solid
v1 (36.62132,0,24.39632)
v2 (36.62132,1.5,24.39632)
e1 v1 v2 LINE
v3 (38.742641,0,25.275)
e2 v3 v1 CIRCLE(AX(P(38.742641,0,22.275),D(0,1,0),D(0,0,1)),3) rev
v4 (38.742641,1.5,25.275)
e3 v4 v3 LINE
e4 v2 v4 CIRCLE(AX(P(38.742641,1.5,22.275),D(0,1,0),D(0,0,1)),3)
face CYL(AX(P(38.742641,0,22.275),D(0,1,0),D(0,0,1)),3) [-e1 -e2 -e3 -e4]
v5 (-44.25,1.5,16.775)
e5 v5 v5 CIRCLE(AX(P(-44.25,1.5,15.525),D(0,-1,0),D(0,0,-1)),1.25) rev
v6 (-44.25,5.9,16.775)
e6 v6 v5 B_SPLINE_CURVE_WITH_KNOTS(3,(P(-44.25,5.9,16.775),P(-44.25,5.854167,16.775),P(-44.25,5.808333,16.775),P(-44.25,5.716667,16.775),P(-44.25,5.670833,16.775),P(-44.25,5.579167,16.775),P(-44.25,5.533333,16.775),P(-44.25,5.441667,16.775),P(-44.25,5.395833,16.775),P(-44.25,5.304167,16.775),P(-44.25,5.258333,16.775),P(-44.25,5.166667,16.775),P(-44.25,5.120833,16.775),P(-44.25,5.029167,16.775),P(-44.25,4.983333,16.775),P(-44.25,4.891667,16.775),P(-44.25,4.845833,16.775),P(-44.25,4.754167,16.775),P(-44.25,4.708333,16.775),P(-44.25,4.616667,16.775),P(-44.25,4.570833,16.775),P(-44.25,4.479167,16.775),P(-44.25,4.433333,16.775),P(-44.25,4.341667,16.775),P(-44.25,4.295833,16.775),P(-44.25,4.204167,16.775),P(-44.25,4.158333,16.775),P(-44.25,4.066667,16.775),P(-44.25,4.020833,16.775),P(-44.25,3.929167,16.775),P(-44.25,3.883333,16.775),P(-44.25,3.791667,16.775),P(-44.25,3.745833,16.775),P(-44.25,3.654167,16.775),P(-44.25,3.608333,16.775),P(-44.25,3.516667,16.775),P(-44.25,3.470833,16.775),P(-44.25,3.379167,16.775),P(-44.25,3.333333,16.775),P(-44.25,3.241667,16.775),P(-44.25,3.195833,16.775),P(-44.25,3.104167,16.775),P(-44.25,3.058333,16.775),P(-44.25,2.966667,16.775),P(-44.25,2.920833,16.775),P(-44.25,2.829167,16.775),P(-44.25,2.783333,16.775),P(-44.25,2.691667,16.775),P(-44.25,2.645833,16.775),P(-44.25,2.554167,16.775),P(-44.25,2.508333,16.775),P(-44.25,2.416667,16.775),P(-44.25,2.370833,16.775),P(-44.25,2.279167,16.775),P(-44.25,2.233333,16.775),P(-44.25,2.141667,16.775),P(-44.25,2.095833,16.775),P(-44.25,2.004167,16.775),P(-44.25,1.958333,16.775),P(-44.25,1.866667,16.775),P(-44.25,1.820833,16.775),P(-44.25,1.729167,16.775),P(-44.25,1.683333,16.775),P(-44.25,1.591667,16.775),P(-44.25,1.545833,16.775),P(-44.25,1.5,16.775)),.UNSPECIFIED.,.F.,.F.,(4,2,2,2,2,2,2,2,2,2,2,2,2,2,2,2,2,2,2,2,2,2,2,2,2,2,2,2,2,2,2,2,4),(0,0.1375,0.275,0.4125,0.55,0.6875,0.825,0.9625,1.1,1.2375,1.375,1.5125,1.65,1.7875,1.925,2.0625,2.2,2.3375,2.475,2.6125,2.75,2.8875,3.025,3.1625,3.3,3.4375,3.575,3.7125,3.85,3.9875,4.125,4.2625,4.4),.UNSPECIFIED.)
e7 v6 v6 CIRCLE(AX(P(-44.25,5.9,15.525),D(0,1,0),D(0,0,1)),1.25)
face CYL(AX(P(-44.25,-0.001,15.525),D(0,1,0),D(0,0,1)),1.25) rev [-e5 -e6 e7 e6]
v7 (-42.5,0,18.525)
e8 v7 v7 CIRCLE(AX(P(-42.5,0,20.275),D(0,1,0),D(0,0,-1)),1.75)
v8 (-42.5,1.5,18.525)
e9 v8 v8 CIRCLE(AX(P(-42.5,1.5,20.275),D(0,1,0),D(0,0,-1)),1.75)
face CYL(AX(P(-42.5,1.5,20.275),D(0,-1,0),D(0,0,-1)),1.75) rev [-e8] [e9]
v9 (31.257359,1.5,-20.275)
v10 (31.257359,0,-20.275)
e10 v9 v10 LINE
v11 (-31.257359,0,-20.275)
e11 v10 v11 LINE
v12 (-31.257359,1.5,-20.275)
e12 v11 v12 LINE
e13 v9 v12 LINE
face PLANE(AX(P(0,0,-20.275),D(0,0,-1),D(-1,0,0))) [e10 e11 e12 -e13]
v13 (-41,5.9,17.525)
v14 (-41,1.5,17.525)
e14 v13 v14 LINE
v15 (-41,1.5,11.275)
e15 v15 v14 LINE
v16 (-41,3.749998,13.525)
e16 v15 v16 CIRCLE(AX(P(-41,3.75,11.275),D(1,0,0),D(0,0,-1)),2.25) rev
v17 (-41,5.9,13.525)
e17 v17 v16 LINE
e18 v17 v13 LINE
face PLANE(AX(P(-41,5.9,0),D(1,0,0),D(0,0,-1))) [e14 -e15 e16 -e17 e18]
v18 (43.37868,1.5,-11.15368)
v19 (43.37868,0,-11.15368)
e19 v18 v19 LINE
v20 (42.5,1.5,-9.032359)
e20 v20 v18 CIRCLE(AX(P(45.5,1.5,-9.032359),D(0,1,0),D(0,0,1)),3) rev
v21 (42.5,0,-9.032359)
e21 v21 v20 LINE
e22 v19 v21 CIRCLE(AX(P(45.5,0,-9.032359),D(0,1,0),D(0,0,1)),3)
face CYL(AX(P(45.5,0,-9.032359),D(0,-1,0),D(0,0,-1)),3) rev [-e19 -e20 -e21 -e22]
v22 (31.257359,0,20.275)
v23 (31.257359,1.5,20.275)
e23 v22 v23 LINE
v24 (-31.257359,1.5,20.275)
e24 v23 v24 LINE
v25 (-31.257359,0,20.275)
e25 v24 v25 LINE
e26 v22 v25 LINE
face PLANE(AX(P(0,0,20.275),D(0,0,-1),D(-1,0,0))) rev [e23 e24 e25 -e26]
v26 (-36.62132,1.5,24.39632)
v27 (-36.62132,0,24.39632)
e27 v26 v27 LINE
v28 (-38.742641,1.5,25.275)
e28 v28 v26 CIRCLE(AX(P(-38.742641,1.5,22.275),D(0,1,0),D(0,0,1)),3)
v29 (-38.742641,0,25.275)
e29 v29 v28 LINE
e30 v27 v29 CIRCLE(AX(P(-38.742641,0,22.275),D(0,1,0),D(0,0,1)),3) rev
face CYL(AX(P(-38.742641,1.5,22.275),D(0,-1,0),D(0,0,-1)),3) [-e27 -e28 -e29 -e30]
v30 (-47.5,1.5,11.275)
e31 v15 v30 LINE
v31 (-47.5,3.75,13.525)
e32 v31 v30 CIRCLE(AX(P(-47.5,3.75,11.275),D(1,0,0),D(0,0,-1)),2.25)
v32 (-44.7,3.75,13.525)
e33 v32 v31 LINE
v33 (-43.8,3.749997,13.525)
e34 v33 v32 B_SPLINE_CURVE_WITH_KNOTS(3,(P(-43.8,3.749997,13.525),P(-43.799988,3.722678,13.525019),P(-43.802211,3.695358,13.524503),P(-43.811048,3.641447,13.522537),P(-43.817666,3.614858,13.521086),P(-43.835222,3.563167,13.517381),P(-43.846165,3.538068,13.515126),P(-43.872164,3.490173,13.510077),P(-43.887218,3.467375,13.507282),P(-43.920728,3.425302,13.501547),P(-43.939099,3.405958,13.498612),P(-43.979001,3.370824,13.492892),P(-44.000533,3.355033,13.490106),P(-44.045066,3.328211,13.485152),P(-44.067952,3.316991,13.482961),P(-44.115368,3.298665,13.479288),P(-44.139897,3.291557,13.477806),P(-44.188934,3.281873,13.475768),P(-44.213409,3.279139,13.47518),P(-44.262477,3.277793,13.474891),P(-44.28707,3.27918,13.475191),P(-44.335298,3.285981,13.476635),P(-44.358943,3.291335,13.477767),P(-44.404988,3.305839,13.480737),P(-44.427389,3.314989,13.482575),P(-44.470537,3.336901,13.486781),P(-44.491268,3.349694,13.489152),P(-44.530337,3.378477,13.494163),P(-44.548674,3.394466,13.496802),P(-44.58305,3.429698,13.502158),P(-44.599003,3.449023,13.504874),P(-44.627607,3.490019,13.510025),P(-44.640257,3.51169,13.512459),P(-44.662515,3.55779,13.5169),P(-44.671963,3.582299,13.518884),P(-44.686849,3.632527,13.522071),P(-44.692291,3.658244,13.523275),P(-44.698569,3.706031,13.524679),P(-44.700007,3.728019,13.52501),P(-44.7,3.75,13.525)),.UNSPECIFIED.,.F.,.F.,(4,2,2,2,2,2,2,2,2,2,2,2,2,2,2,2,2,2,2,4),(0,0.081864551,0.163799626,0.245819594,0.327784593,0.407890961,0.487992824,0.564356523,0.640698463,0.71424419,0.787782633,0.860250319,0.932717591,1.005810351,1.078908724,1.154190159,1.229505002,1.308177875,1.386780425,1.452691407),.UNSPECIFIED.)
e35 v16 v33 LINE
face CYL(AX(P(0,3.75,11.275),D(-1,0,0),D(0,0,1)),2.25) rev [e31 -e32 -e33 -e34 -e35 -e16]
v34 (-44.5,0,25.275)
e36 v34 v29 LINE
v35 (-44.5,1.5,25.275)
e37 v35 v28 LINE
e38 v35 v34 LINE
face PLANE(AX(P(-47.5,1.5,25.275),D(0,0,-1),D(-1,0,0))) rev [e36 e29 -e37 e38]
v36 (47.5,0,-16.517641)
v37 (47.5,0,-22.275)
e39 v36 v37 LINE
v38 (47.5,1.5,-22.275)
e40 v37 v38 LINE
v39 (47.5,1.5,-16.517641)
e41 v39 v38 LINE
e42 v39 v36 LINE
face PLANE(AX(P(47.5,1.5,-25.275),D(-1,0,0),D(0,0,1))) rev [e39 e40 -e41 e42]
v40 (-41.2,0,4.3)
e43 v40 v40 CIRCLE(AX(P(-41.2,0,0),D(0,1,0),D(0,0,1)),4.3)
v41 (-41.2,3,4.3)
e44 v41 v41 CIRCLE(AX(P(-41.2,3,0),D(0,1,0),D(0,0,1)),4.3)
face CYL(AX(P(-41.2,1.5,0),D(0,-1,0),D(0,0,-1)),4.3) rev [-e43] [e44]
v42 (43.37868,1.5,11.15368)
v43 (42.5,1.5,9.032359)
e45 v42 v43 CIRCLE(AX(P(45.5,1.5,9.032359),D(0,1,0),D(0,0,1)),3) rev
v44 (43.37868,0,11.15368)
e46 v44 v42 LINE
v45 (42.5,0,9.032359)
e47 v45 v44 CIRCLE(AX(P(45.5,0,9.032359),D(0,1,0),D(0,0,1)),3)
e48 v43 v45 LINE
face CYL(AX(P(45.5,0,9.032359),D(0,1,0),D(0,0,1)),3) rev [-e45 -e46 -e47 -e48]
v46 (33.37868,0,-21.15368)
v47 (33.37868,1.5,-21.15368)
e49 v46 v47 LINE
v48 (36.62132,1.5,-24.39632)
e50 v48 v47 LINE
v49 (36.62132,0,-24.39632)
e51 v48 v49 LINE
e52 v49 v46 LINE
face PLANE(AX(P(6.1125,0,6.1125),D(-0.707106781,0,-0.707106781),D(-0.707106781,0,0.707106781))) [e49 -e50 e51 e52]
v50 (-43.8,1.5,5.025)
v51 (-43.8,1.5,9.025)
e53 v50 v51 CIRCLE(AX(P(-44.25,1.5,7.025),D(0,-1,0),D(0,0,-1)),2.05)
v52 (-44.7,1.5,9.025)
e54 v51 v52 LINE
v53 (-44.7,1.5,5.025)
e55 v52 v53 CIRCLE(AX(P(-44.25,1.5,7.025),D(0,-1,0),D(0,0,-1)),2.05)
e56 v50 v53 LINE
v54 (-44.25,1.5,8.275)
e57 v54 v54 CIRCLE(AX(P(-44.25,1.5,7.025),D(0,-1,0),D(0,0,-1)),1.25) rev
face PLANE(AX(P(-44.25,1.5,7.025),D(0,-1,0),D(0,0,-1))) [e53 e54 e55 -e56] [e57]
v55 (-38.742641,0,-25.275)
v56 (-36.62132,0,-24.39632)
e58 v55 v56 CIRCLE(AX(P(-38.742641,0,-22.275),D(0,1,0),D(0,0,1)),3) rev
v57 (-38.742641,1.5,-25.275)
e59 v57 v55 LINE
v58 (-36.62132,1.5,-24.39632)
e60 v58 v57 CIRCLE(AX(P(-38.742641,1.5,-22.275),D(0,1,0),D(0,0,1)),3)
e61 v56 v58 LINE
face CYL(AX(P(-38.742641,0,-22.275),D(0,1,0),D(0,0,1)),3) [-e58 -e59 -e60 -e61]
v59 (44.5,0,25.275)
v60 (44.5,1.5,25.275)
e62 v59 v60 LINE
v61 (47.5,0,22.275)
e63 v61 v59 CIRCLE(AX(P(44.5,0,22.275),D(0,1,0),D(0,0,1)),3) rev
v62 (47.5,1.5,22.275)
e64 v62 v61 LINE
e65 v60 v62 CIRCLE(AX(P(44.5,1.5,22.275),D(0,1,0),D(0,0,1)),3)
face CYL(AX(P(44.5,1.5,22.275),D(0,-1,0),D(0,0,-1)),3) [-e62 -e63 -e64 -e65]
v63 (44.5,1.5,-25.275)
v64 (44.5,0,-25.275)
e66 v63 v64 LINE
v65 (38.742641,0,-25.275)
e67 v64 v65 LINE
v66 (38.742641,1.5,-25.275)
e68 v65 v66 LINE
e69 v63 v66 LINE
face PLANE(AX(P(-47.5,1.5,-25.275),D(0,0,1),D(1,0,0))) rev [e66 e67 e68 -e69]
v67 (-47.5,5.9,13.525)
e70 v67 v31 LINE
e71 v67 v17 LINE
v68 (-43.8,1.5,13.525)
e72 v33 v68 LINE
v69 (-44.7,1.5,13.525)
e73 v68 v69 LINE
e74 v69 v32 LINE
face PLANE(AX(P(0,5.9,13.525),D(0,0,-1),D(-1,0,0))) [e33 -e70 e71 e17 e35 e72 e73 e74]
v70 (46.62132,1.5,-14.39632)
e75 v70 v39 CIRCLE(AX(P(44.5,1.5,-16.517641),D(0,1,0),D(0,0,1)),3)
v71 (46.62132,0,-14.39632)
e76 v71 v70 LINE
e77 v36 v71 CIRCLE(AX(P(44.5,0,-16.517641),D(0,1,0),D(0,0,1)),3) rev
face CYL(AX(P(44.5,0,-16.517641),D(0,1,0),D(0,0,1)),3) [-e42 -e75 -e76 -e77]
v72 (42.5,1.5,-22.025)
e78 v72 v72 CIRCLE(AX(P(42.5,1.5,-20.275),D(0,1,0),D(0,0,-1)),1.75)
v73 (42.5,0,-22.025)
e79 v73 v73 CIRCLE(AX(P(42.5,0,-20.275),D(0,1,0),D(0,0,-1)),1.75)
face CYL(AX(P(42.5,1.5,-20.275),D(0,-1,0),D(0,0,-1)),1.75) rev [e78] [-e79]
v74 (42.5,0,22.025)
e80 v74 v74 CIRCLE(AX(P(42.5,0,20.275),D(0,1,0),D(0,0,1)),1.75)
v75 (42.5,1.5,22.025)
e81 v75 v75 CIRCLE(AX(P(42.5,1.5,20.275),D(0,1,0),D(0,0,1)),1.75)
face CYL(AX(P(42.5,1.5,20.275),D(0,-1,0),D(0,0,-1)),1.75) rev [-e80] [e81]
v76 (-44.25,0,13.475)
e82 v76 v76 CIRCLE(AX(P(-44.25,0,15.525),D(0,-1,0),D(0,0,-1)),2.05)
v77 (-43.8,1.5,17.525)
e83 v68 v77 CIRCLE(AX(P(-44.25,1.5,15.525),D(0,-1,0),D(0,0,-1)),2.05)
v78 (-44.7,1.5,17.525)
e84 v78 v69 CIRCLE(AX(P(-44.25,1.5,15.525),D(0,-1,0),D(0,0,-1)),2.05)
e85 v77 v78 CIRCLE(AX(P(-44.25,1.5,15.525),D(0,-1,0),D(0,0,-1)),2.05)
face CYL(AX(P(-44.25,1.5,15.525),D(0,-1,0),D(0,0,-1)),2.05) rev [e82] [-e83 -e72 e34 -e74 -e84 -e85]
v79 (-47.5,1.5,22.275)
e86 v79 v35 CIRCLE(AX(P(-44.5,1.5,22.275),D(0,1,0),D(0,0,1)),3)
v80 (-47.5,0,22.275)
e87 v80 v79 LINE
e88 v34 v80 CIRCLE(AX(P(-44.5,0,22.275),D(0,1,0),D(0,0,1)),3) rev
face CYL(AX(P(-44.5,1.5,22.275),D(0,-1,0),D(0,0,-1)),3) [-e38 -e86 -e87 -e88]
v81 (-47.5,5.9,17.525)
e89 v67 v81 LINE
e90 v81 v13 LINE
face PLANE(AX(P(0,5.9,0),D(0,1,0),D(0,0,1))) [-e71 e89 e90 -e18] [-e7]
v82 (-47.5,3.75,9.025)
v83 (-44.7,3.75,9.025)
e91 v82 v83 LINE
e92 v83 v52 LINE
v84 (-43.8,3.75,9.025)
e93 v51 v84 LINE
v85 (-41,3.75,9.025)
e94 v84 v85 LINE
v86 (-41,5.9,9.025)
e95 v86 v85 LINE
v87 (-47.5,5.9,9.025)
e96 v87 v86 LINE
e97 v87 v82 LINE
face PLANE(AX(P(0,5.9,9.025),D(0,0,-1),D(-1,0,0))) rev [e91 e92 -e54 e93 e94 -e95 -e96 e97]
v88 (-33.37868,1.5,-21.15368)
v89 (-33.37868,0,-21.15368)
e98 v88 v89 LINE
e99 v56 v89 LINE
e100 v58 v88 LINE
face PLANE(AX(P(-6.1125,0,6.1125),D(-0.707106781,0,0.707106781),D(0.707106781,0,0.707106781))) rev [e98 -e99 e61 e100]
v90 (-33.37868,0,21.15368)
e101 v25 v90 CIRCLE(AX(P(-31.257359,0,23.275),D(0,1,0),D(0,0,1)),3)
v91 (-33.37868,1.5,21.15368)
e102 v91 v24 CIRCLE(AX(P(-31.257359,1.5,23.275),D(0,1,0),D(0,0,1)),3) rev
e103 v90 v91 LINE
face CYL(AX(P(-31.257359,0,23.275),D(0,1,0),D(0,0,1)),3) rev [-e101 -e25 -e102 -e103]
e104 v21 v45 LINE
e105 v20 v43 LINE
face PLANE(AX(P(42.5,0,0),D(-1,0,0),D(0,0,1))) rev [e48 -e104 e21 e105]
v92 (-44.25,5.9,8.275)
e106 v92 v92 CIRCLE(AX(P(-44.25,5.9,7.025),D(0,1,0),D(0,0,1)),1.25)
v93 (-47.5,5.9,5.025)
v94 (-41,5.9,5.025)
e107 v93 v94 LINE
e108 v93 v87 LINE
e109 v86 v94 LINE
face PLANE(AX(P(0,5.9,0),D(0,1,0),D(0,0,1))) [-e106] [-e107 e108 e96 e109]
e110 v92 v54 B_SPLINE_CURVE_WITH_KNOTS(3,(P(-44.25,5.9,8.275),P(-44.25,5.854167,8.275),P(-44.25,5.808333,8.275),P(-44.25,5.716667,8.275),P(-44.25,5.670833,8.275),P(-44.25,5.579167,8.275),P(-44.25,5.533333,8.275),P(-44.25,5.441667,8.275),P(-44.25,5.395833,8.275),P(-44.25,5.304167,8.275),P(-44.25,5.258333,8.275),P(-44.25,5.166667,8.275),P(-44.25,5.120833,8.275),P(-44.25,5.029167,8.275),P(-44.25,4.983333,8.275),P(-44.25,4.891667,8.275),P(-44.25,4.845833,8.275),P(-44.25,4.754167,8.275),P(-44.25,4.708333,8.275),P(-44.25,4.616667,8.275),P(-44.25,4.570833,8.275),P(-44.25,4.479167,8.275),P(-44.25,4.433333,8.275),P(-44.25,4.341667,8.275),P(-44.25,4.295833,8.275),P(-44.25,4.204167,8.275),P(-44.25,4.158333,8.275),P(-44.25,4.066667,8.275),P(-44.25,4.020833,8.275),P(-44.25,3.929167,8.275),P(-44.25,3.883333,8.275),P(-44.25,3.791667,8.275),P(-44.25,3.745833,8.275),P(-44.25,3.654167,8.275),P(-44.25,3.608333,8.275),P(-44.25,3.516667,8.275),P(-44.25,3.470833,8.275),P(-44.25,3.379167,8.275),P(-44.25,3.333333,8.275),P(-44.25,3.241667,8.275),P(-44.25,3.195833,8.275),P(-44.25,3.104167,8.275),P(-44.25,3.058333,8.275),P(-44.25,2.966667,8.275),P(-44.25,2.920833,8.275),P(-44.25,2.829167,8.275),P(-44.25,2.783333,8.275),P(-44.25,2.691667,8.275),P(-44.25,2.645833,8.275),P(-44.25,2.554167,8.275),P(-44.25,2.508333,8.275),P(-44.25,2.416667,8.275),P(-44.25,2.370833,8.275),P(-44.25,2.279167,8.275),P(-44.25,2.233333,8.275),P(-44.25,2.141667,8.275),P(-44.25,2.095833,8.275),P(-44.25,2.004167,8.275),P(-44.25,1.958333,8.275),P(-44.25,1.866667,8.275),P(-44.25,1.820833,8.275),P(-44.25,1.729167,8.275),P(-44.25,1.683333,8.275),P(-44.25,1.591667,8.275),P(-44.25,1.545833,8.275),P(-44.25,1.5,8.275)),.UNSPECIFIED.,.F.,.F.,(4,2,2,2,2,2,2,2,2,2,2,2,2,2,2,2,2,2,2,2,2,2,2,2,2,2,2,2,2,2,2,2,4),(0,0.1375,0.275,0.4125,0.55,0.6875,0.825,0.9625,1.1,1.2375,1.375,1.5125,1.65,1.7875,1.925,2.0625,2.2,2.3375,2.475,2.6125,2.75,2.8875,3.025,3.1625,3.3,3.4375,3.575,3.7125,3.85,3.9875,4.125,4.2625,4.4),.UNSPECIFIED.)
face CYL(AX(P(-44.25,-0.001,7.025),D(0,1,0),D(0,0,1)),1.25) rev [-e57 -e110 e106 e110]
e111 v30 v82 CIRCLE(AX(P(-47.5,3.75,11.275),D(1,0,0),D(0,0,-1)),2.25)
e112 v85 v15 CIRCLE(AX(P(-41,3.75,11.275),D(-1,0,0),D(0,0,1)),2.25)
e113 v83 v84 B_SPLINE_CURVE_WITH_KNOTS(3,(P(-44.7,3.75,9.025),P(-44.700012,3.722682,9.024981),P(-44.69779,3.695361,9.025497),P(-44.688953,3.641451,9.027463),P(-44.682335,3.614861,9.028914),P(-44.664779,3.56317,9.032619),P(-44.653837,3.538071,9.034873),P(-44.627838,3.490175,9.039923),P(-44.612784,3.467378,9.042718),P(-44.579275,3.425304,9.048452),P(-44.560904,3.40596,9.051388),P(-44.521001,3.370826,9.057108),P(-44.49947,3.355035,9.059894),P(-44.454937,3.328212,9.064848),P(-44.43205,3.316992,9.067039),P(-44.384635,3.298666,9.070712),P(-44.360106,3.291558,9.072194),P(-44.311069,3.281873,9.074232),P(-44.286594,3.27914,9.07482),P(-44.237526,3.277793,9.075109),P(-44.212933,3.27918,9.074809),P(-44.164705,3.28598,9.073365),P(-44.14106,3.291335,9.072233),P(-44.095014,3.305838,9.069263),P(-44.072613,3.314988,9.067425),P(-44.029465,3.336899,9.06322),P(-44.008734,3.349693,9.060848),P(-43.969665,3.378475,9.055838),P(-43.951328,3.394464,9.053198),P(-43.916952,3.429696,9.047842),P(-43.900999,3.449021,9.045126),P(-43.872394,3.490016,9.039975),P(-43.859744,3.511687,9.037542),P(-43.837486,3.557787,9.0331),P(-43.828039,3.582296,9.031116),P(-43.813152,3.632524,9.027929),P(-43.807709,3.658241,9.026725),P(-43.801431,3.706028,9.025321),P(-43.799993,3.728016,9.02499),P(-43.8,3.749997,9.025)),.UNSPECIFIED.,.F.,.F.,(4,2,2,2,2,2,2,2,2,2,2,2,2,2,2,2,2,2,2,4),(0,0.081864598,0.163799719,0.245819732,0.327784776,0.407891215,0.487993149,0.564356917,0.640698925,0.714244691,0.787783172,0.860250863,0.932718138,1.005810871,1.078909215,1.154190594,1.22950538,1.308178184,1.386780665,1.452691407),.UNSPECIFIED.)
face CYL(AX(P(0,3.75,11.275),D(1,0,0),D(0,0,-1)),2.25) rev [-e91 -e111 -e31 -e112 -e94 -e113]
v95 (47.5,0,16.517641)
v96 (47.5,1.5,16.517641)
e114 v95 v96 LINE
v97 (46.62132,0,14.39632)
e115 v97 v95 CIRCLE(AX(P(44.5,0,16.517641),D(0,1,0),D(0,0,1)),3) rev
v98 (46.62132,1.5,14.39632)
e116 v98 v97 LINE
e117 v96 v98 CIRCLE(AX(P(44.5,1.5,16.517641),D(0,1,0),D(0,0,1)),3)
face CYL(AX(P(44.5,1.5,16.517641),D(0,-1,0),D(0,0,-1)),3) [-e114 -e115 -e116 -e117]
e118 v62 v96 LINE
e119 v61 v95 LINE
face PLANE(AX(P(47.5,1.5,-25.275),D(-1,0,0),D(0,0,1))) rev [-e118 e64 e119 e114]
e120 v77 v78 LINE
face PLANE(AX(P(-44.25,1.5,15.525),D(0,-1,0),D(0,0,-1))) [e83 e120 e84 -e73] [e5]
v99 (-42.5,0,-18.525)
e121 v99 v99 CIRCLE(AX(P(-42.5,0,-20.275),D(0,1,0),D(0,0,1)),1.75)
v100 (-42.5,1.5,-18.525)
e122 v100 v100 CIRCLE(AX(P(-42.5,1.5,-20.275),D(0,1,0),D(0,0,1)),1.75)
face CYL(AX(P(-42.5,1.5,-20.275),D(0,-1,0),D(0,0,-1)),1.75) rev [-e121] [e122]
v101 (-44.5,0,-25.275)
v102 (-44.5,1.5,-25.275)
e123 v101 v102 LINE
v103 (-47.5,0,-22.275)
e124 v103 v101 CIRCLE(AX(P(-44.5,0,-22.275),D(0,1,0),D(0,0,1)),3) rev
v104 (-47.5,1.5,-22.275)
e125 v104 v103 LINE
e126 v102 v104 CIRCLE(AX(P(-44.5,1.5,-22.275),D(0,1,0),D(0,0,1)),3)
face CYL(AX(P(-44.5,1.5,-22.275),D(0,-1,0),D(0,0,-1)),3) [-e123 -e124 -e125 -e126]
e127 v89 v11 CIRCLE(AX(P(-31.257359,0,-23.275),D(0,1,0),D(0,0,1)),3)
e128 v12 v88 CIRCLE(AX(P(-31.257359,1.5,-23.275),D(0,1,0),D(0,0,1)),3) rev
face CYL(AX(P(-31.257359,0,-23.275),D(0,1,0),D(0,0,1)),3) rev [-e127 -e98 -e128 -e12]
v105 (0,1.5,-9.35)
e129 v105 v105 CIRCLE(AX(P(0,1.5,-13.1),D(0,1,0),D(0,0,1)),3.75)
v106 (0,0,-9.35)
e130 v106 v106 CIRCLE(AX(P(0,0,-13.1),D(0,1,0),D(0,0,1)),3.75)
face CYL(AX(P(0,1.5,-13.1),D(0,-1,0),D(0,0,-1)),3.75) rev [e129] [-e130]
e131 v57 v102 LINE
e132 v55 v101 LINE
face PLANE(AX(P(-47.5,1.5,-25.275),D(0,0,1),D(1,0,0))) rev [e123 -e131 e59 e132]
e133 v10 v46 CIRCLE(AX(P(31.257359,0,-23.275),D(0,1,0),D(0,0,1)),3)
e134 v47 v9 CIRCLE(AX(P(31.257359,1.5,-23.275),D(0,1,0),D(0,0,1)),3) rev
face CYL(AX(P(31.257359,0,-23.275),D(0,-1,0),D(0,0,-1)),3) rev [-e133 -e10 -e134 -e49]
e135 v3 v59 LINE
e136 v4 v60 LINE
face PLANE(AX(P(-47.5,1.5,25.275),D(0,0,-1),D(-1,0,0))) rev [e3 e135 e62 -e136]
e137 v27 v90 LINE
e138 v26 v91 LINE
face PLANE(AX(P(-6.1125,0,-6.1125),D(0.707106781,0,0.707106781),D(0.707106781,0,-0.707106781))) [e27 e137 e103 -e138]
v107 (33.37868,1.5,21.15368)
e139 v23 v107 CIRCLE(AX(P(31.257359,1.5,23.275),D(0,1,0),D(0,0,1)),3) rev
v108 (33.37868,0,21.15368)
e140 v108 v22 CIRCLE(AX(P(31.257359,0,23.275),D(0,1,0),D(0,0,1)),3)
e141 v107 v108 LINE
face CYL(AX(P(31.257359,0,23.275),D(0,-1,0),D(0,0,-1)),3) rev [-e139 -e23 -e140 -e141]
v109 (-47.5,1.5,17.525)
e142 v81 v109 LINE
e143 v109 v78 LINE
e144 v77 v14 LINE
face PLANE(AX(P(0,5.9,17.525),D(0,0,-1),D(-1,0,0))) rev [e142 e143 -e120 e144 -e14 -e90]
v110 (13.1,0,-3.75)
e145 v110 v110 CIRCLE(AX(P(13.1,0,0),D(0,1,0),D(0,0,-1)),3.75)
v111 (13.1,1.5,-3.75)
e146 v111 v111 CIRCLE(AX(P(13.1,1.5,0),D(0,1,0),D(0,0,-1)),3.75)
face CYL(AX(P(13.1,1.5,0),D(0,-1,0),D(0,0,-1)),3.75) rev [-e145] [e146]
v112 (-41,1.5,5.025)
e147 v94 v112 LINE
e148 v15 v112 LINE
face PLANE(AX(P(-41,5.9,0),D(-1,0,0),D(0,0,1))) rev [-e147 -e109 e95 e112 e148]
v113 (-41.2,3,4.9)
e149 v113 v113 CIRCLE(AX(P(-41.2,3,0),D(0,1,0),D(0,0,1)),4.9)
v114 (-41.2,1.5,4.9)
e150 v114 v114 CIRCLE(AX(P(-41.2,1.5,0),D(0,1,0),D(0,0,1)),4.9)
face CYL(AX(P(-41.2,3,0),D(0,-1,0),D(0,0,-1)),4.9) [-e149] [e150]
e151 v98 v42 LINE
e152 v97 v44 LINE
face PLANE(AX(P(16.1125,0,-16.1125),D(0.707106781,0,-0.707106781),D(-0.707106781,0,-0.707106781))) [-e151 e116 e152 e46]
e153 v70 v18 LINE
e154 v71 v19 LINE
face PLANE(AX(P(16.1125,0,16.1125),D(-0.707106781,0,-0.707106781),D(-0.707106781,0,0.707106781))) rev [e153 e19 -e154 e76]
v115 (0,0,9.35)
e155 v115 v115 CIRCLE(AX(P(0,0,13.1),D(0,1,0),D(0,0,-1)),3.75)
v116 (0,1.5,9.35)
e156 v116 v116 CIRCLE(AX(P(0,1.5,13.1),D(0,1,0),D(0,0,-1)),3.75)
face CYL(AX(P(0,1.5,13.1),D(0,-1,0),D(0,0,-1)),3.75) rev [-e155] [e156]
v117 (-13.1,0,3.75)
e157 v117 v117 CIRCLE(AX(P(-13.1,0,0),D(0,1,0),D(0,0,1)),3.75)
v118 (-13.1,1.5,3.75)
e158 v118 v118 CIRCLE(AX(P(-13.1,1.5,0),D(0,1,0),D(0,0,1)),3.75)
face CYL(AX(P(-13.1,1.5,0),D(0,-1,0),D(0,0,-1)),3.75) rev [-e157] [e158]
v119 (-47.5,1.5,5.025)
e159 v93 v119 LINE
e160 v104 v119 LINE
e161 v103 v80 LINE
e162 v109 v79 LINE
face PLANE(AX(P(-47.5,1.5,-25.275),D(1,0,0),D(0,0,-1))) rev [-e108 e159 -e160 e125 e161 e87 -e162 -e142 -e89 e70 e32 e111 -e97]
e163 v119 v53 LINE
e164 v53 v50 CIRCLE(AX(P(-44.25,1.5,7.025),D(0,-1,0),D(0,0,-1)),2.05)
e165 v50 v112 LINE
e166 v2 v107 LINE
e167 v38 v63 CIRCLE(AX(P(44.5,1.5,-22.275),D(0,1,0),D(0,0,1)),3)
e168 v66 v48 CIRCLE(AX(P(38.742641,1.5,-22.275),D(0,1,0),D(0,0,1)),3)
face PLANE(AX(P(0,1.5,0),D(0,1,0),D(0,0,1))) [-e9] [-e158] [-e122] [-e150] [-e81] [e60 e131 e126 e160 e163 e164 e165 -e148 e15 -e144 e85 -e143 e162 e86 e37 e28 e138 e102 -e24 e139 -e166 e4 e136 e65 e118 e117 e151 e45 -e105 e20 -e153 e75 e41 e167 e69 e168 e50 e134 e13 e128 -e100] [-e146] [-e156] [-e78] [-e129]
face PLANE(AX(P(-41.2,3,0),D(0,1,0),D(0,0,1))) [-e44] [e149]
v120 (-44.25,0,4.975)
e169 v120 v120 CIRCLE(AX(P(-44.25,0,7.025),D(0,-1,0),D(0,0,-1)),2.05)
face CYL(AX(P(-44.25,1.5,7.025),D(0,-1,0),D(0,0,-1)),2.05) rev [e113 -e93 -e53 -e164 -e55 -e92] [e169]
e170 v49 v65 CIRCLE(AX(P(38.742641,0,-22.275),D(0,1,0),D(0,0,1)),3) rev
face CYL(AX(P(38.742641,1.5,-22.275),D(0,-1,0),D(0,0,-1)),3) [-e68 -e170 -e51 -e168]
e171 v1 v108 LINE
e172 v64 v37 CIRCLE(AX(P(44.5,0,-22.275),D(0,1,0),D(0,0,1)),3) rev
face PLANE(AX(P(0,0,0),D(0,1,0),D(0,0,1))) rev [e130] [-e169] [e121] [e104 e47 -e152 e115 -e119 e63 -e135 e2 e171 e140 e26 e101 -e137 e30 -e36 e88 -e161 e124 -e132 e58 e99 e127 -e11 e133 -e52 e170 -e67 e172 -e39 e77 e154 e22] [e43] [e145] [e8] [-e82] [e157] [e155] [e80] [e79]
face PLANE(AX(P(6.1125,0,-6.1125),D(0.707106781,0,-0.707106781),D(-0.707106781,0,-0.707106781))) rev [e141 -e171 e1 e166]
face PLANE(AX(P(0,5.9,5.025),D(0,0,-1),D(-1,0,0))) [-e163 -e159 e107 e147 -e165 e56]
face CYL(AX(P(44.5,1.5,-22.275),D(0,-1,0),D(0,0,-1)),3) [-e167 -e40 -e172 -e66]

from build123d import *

# Parameters (mm, degrees)
SKETCH1_W           = 95
SKETCH1_H           = 50.55
SKETCH1_R           = 1.75
SKETCH1_R_2         = 3.75
SKETCH1_R_3         = 4.3
BOSS_EXTRUDE1_DEPTH = 1.5
CUT_EXTRUDE1_DEPTH  = 1.5
FILLET1_R           = 3
SKETCH3_R           = 4.9
SKETCH3_R_2         = 4.3
BOSS_EXTRUDE2_DEPTH = 1.5
SKETCH5_W           = 6.5
SKETCH5_H           = 4
BOSS_EXTRUDE3_DEPTH = 4.4
CUT_EXTRUDE2_REACH  = 56.128
SKETCH6_R           = 1.25
SKETCH8_R           = 2.05
CUT_EXTRUDE3_DEPTH  = 1.5
FILLET2_R           = 2.25


with BuildPart() as part:
    # Sketch1 → Boss-Extrude1 (new body)
    with BuildSketch(Plane(origin=(0, 0, 0), x_dir=(1, 0, 0), z_dir=(0, 1, 0))):
        Rectangle(SKETCH1_W, SKETCH1_H)
        with Locations(Location((-42.5, 20.275, 0), (0, 0, 270))):
            Circle(SKETCH1_R, mode=Mode.SUBTRACT)
        with Locations(Location((42.5, 20.275, 0), (0, 0, 90))):
            Circle(SKETCH1_R, mode=Mode.SUBTRACT)
        with Locations(Location((42.5, -20.275, 0), (0, 0, 270))):
            Circle(SKETCH1_R, mode=Mode.SUBTRACT)
        with Locations(Location((-42.5, -20.275, 0), (0, 0, 90))):
            Circle(SKETCH1_R, mode=Mode.SUBTRACT)
        with Locations(Location((-13.1, 0, 0), (0, 0, 270))):
            Circle(SKETCH1_R_2, mode=Mode.SUBTRACT)
        with Locations(Location((13.1, 0, 0), (0, 0, 90))):
            Circle(SKETCH1_R_2, mode=Mode.SUBTRACT)
        with Locations(Location((0, 13.1, 0), (0, 0, 270))):
            Circle(SKETCH1_R_2, mode=Mode.SUBTRACT)
        with Locations(Location((0, -13.1, 0), (0, 0, 90))):
            Circle(SKETCH1_R_2, mode=Mode.SUBTRACT)
        with Locations(Location((-41.2, 0, 0), (0, 0, 270))):
            Circle(SKETCH1_R_3, mode=Mode.SUBTRACT)
    extrude(amount=BOSS_EXTRUDE1_DEPTH)

    # Sketch2 → Cut-Extrude1 (cut)
    with BuildSketch(Plane(origin=(0, 1.5, 0), x_dir=(1, 0, 0), z_dir=(0, 1, 0))):
        Polygon((-32.5, 20.275), (32.5, 20.275), (37.5, 25.275), (-37.5, 25.275), align=None)
        Polygon((37.5, -25.275), (32.5, -20.275), (-32.5, -20.275), (-37.5, -25.275), align=None)
        Polygon((47.5, -15.275), (47.5, 15.275), (42.5, 10.275), (42.5, -10.275), align=None)
    extrude(amount=-CUT_EXTRUDE1_DEPTH, mode=Mode.SUBTRACT)

    # Fillet1
    fillet1_edges = [part.edges().sort_by_distance(p)[0] for p in [
        (37.5, 0.75, -25.275),
        (32.5, 0.75, -20.275),
        (-32.5, 0.75, -20.275),
        (-37.5, 0.75, -25.275),
        (-37.5, 0.75, 25.275),
        (-32.5, 0.75, 20.275),
        (32.5, 0.75, 20.275),
        (37.5, 0.75, 25.275),
        (47.5, 0.75, 25.275),
        (-47.5, 0.75, 25.275),
        (-47.5, 0.75, -25.275),
        (47.5, 0.75, -25.275),
        (47.5, 0.75, 15.275),
        (42.5, 0.75, 10.275),
        (42.5, 0.75, -10.275),
        (47.5, 0.75, -15.275),
    ]]
    fillet(fillet1_edges, radius=FILLET1_R)

    # Sketch3 → Boss-Extrude2 (add)
    with BuildSketch(Plane(origin=(0, 1.5, 0), x_dir=(1, 0, 0), z_dir=(0, 1, 0))):
        with Locations(Location((-41.2, 0, 0), (0, 0, 270))):
            Circle(SKETCH3_R)
        with Locations(Location((-41.2, 0, 0), (0, 0, 270))):
            Circle(SKETCH3_R_2, mode=Mode.SUBTRACT)
    extrude(amount=BOSS_EXTRUDE2_DEPTH)

    # Sketch5 → Boss-Extrude3 (add)
    with BuildSketch(Plane(origin=(0, 1.5, 0), x_dir=(1, 0, 0), z_dir=(0, 1, 0))):
        with Locations((-44.25, -7.025)):
            Rectangle(SKETCH5_W, SKETCH5_H)
        with Locations((-44.25, -15.525)):
            Rectangle(SKETCH5_W, SKETCH5_H)
    extrude(amount=BOSS_EXTRUDE3_DEPTH)

    # Sketch6 → Cut-Extrude2 (cut, up to next)
    with BuildSketch(Plane(origin=(0, 5.9, 0), x_dir=(1, 0, 0), z_dir=(0, 1, 0)), mode=Mode.PRIVATE) as cut_extrude2_sk1:
        with Locations(Location((-44.25, -7.025, 0), (0, 0, 270))):
            Circle(SKETCH6_R)
    cut_extrude2_tool1 = extrude(cut_extrude2_sk1.sketch, amount=-CUT_EXTRUDE2_REACH, mode=Mode.PRIVATE) & part.part
    # Sketch6 → Cut-Extrude2 (cut, up to next)
    with BuildSketch(Plane(origin=(0, 5.9, 0), x_dir=(1, 0, 0), z_dir=(0, 1, 0)), mode=Mode.PRIVATE) as cut_extrude2_sk2:
        with Locations(Location((-44.25, -15.525, 0), (0, 0, 270))):
            Circle(SKETCH6_R)
    cut_extrude2_tool2 = extrude(cut_extrude2_sk2.sketch, amount=-CUT_EXTRUDE2_REACH, mode=Mode.PRIVATE) & part.part
    add(cut_extrude2_tool1.solids().sort_by_distance((-44.25, 5.9, 7.025))[0], mode=Mode.SUBTRACT)
    add(cut_extrude2_tool2.solids().sort_by_distance((-44.25, 5.9, 15.525))[0], mode=Mode.SUBTRACT)

    # Sketch8 → Cut-Extrude3 (cut)
    with BuildSketch(Plane.XZ):
        with Locations(Location((-44.25, 15.525, 0), (0, 0, 270))):
            Circle(SKETCH8_R)
        with Locations(Location((-44.25, 7.025, 0), (0, 0, 270))):
            Circle(SKETCH8_R)
    extrude(amount=-CUT_EXTRUDE3_DEPTH, mode=Mode.SUBTRACT)

    # Fillet2
    # the kernel refuses this fillet: 2.25 mm, written as the material it adds along each edge
    with BuildSketch(Plane(origin=(-39.075, 1.5, 13.525), x_dir=(0, 0, -1), z_dir=(-1, 0, 0))) as fillet2_piece_1_section:
        with BuildLine():
            CenterArc((FILLET2_R, -FILLET2_R), FILLET2_R, 90, 90)
            Line((0, -FILLET2_R), (0, 0))
            Line((0, 0), (FILLET2_R, 0))
        make_face()
    fillet2_piece_1 = extrude(amount=8.425, mode=Mode.PRIVATE)
    fillet2_piece_1 = fillet2_piece_1 - Plane(origin=(-44.25, 1.998463369, 15.525), x_dir=(0, 0, -1), z_dir=(0, -1, 0)) * Cylinder(2.05, 26, mode=Mode.PRIVATE)
    fillet2_piece_1 = split(fillet2_piece_1, bisect_by=Plane(origin=(-41, 1.998463369, 13.018330937), z_dir=(-1, 0, 0)), keep=Keep.TOP, mode=Mode.PRIVATE)
    add(fillet2_piece_1)
    with BuildSketch(Plane(origin=(-41, 1.5, 13.525), x_dir=(0, 0, -1), z_dir=(-1, 0, 0))) as fillet2_piece_2_section:
        with BuildLine():
            CenterArc((FILLET2_R, -FILLET2_R), FILLET2_R, 90, 90)
            Line((0, -FILLET2_R), (0, 0))
            Line((0, 0), (FILLET2_R, 0))
        make_face()
    fillet2_piece_2 = extrude(amount=8.425, mode=Mode.PRIVATE)
    fillet2_piece_2 = split(fillet2_piece_2, bisect_by=Plane(origin=(-47.5, 1.998463369, 13.018330937), z_dir=(1, 0, 0)), keep=Keep.TOP, mode=Mode.PRIVATE)
    fillet2_piece_2 = fillet2_piece_2 - Plane(origin=(-44.25, 1.998463369, 15.525), x_dir=(0, 0, -1), z_dir=(0, -1, 0)) * Cylinder(2.05, 26, mode=Mode.PRIVATE)
    add(fillet2_piece_2)
    with BuildSketch(Plane(origin=(-47.5, 1.5, 9.025), x_dir=(0, 0, 1), z_dir=(1, 0, 0))) as fillet2_piece_3_section:
        with BuildLine():
            CenterArc((FILLET2_R, -FILLET2_R), FILLET2_R, 90, 90)
            Line((0, -FILLET2_R), (0, 0))
            Line((0, 0), (FILLET2_R, 0))
        make_face()
    fillet2_piece_3 = extrude(amount=8.425, mode=Mode.PRIVATE)
    fillet2_piece_3 = fillet2_piece_3 - Plane(origin=(-44.25, 1.998463384, 7.025), x_dir=(0, 0, -1), z_dir=(0, -1, 0)) * Cylinder(2.05, 26, mode=Mode.PRIVATE)
    fillet2_piece_3 = split(fillet2_piece_3, bisect_by=Plane(origin=(-41, 1.998463384, 9.531669097), z_dir=(-1, 0, 0)), keep=Keep.TOP, mode=Mode.PRIVATE)
    add(fillet2_piece_3)
    with BuildSketch(Plane(origin=(-49.425, 1.5, 9.025), x_dir=(0, 0, 1), z_dir=(1, 0, 0))) as fillet2_piece_4_section:
        with BuildLine():
            CenterArc((FILLET2_R, -FILLET2_R), FILLET2_R, 90, 90)
            Line((0, -FILLET2_R), (0, 0))
            Line((0, 0), (FILLET2_R, 0))
        make_face()
    fillet2_piece_4 = extrude(amount=8.425, mode=Mode.PRIVATE)
    fillet2_piece_4 = split(fillet2_piece_4, bisect_by=Plane(origin=(-47.5, 1.998463384, 9.531669097), z_dir=(1, 0, 0)), keep=Keep.TOP, mode=Mode.PRIVATE)
    fillet2_piece_4 = fillet2_piece_4 - Plane(origin=(-44.25, 1.998463384, 7.025), x_dir=(0, 0, -1), z_dir=(0, -1, 0)) * Cylinder(2.05, 26, mode=Mode.PRIVATE)
    add(fillet2_piece_4)


solid = part.part
